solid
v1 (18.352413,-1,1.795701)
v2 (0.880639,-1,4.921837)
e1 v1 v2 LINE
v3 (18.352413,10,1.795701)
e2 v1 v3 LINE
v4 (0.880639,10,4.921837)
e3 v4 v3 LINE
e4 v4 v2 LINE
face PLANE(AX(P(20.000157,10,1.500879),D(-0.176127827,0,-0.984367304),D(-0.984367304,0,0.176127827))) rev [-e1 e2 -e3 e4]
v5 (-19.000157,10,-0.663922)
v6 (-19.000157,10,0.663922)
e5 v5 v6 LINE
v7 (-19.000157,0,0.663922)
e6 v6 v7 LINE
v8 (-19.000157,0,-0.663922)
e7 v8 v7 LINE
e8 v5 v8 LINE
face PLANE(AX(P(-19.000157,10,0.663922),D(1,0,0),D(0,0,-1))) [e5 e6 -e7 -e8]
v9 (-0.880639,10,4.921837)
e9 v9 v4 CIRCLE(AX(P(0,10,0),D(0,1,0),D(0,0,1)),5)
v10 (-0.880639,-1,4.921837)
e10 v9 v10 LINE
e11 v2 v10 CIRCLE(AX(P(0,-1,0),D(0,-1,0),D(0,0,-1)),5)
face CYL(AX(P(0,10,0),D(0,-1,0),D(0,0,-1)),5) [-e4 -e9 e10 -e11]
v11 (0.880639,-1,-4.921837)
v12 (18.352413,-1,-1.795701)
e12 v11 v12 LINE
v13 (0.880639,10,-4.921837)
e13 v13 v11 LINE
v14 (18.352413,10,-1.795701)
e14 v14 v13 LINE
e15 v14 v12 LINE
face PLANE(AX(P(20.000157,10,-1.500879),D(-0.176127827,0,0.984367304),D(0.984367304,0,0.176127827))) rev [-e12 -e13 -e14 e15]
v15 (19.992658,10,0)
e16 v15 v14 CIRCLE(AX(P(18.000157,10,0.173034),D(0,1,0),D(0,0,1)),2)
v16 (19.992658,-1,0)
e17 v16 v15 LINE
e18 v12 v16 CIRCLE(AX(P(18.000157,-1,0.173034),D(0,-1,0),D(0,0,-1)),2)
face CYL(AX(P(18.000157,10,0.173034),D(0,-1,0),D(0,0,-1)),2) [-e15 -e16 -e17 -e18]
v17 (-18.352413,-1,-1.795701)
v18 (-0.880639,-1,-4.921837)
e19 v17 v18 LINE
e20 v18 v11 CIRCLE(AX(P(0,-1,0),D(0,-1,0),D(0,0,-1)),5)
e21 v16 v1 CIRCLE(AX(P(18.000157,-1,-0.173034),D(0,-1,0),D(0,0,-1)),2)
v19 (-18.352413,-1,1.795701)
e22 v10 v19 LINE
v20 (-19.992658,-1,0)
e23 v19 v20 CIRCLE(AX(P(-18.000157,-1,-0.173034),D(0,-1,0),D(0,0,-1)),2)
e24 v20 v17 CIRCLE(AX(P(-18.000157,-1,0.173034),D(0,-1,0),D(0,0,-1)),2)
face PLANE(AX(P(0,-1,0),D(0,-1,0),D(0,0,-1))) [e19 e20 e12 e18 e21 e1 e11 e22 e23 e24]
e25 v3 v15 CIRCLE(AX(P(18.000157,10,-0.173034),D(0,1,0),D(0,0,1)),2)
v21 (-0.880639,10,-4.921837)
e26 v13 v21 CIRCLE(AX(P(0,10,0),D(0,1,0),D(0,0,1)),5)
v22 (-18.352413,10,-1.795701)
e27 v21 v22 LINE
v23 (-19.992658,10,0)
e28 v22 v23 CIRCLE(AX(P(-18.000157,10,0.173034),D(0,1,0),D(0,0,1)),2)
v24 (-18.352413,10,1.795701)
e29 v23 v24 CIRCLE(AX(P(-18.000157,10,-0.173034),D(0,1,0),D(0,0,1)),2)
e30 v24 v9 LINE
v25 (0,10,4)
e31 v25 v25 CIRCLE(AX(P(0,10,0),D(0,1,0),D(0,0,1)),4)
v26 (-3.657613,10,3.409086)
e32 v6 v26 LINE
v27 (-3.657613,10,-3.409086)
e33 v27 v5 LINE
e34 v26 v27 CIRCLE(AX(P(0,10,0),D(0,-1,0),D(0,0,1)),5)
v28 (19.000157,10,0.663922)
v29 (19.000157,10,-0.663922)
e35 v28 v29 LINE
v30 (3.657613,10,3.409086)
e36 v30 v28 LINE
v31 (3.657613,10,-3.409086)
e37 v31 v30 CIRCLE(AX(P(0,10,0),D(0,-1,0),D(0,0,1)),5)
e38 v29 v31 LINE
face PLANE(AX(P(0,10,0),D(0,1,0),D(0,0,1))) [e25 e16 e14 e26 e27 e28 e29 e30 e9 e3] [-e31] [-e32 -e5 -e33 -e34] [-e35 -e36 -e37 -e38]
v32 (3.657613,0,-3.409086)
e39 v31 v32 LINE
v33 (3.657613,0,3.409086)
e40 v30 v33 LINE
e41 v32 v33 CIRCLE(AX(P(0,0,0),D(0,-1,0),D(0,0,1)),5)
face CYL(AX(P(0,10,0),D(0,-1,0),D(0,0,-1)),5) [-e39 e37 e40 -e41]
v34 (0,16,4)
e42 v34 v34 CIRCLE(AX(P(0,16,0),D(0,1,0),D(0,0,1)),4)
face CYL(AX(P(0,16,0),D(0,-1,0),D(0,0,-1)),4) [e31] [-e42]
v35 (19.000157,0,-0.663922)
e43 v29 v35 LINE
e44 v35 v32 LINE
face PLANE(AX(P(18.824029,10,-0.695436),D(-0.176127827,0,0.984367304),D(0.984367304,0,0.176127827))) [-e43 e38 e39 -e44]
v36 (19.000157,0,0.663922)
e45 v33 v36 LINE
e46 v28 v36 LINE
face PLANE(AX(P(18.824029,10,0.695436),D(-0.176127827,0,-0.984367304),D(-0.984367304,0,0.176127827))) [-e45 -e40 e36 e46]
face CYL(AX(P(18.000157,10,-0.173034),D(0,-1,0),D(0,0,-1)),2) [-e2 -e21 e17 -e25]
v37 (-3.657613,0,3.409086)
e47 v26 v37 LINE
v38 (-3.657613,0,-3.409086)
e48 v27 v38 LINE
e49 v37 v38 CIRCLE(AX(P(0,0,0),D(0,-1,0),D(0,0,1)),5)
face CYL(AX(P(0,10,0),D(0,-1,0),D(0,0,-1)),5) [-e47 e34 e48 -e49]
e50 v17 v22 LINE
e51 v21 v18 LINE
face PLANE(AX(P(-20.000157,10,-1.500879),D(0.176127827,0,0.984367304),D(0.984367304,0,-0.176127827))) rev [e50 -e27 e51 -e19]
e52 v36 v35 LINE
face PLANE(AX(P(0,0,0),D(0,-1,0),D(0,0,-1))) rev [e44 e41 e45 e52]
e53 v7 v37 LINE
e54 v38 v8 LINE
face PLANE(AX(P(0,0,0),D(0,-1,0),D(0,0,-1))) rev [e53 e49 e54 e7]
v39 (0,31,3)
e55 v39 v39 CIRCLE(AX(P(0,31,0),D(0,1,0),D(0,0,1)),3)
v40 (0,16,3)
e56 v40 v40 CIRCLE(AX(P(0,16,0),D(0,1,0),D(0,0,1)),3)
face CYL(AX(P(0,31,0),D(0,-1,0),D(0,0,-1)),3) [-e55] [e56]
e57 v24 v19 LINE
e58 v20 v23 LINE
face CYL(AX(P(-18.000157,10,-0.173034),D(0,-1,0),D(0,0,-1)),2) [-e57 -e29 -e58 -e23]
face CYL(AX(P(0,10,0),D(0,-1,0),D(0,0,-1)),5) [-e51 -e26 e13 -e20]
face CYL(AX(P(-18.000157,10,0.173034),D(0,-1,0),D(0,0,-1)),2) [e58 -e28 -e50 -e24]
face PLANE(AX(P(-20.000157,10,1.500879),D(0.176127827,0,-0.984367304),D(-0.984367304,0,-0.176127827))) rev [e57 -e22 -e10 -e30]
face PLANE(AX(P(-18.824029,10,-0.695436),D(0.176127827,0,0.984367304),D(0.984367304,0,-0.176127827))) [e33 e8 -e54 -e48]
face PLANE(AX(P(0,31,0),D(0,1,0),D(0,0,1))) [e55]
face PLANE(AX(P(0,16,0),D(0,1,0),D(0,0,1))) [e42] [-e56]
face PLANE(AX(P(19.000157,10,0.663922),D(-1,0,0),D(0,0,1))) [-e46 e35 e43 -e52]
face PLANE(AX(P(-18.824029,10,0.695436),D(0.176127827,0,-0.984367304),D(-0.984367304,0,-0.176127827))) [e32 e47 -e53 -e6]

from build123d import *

# Parameters (mm, degrees)
BOSS_EXTRUDE1_DEPTH = 10
BOSS_EXTRUDE2_START = 1
BOSS_EXTRUDE2_DEPTH = 1
SKETCH3_R           = 4
BOSS_EXTRUDE3_DEPTH = 6
SKETCH4_R           = 3
BOSS_EXTRUDE4_DEPTH = 15
FILLET1_R           = 2


with BuildPart() as part:
    # Sketch1 → Boss-Extrude1 (new body)
    with BuildSketch(Plane(origin=(0, 0, 0), x_dir=(1, 0, 0), z_dir=(0, 1, 0))):
        with BuildLine():
            Line((-20.000157194, 1.500878546), (-20.000157194, -1.500878546))
            Line((-20.000157194, -1.500878546), (-0.880639137, -4.921836518))
            ThreePointArc((-0.880639137, -4.921836518), (0, -5), (0.880639137, -4.921836518))
            Line((0.880639137, -4.921836518), (20.000157194, -1.500878546))
            Line((20.000157194, -1.500878546), (20.000157194, 1.500878546))
            Line((20.000157194, 1.500878546), (0.880639137, 4.921836518))
            ThreePointArc((0.880639137, 4.921836518), (0, 5), (-0.880639137, 4.921836518))
            Line((-0.880639137, 4.921836518), (-20.000157194, 1.500878546))
        make_face()
        with BuildLine():
            Line((-19.000157194, -0.663922493), (-19.000157194, 0.663922493))
            Line((-19.000157194, 0.663922493), (-18.824029366, 0.695436148))
            Line((-18.824029366, 0.695436148), (-3.65761322, 3.409085733))
            ThreePointArc((-3.65761322, 3.409085733), (-5, 0), (-3.65761322, -3.409085733))
            Line((-3.65761322, -3.409085733), (-18.824029366, -0.695436148))
            Line((-18.824029366, -0.695436148), (-19.000157194, -0.663922493))
        make_face(mode=Mode.SUBTRACT)
        with BuildLine():
            Line((18.824029366, 0.695436148), (19.000157194, 0.663922493))
            Line((19.000157194, 0.663922493), (19.000157194, -0.663922493))
            Line((19.000157194, -0.663922493), (18.824029366, -0.695436148))
            Line((18.824029366, -0.695436148), (3.65761322, -3.409085733))
            ThreePointArc((3.65761322, -3.409085733), (5, 0), (3.65761322, 3.409085733))
            Line((3.65761322, 3.409085733), (18.824029366, 0.695436148))
        make_face(mode=Mode.SUBTRACT)
    extrude(amount=BOSS_EXTRUDE1_DEPTH)

    # Sketch2 → Boss-Extrude2 (add)
    with BuildSketch(Plane.XZ.offset(BOSS_EXTRUDE2_START)):
        with BuildLine():
            Line((-20.000157194, 1.500878546), (-0.880639137, 4.921836518))
            ThreePointArc((-0.880639137, 4.921836518), (0, 5), (0.880639137, 4.921836518))
            Line((0.880639137, 4.921836518), (20.000157194, 1.500878546))
            Line((20.000157194, 1.500878546), (20.000157194, -1.500878546))
            Line((20.000157194, -1.500878546), (0.880639137, -4.921836518))
            ThreePointArc((0.880639137, -4.921836518), (0, -5), (-0.880639137, -4.921836518))
            Line((-0.880639137, -4.921836518), (-20.000157194, -1.500878546))
            Line((-20.000157194, -1.500878546), (-20.000157194, 1.500878546))
        make_face()
    extrude(amount=-BOSS_EXTRUDE2_DEPTH)

    # Sketch3 → Boss-Extrude3 (add)
    with BuildSketch(Plane(origin=(0, 10, 0), x_dir=(1, 0, 0), z_dir=(0, 1, 0))):
        with Locations(Location((0, 0, 0), (0, 0, 270))):
            Circle(SKETCH3_R)
    extrude(amount=BOSS_EXTRUDE3_DEPTH)

    # Sketch4 → Boss-Extrude4 (add)
    with BuildSketch(Plane(origin=(0, 16, 0), x_dir=(1, 0, 0), z_dir=(0, 1, 0))):
        with Locations(Location((0, 0, 0), (0, 0, 270))):
            Circle(SKETCH4_R)
    extrude(amount=BOSS_EXTRUDE4_DEPTH)

    # Fillet1
    # the kernel refuses this fillet: 2 mm, written as the material it takes off along each edge
    with BuildSketch(Plane(origin=(20.000157194, -5.184780263, 1.500878546), x_dir=(-0.9843673036221247, 0, 0.17612782732920945), z_dir=(0, 1, 0)), Plane(origin=(20.000157194, -5.184780263, -1.500878546), x_dir=(0, 0, 1), z_dir=(0, 1, 0)), Plane(origin=(-20.000157194, 14.184780263, 1.500878546), x_dir=(0.9843673036221245, 0, 0.17612782732920956), z_dir=(0, -1, 0))) as fillet1_piece_1:
        with BuildLine():
            CenterArc((FILLET1_R * 0.836956052521, -FILLET1_R), FILLET1_R, 90, 79.855702636)
            Line((-FILLET1_R * 0.147411251101, -FILLET1_R * 0.823872172671), (0, 0))
            Line((0, 0), (FILLET1_R * 0.836956052521, 0))
        make_face()
    extrude(amount=19.369560525, mode=Mode.SUBTRACT)
    with BuildSketch(Plane(origin=(-20.000157194, -5.184780263, -1.500878546), x_dir=(0, 0, 1), z_dir=(0, 1, 0))) as fillet1_piece_2:
        with BuildLine():
            CenterArc((FILLET1_R * 0.836956052521, FILLET1_R), FILLET1_R, 190.144297364, 79.855702636)
            Line((-FILLET1_R * 0.147411251101, FILLET1_R * 0.823872172671), (0, 0))
            Line((0, 0), (FILLET1_R * 0.836956052521, 0))
        make_face()
    extrude(amount=19.369560525, mode=Mode.SUBTRACT)


solid = part.part
